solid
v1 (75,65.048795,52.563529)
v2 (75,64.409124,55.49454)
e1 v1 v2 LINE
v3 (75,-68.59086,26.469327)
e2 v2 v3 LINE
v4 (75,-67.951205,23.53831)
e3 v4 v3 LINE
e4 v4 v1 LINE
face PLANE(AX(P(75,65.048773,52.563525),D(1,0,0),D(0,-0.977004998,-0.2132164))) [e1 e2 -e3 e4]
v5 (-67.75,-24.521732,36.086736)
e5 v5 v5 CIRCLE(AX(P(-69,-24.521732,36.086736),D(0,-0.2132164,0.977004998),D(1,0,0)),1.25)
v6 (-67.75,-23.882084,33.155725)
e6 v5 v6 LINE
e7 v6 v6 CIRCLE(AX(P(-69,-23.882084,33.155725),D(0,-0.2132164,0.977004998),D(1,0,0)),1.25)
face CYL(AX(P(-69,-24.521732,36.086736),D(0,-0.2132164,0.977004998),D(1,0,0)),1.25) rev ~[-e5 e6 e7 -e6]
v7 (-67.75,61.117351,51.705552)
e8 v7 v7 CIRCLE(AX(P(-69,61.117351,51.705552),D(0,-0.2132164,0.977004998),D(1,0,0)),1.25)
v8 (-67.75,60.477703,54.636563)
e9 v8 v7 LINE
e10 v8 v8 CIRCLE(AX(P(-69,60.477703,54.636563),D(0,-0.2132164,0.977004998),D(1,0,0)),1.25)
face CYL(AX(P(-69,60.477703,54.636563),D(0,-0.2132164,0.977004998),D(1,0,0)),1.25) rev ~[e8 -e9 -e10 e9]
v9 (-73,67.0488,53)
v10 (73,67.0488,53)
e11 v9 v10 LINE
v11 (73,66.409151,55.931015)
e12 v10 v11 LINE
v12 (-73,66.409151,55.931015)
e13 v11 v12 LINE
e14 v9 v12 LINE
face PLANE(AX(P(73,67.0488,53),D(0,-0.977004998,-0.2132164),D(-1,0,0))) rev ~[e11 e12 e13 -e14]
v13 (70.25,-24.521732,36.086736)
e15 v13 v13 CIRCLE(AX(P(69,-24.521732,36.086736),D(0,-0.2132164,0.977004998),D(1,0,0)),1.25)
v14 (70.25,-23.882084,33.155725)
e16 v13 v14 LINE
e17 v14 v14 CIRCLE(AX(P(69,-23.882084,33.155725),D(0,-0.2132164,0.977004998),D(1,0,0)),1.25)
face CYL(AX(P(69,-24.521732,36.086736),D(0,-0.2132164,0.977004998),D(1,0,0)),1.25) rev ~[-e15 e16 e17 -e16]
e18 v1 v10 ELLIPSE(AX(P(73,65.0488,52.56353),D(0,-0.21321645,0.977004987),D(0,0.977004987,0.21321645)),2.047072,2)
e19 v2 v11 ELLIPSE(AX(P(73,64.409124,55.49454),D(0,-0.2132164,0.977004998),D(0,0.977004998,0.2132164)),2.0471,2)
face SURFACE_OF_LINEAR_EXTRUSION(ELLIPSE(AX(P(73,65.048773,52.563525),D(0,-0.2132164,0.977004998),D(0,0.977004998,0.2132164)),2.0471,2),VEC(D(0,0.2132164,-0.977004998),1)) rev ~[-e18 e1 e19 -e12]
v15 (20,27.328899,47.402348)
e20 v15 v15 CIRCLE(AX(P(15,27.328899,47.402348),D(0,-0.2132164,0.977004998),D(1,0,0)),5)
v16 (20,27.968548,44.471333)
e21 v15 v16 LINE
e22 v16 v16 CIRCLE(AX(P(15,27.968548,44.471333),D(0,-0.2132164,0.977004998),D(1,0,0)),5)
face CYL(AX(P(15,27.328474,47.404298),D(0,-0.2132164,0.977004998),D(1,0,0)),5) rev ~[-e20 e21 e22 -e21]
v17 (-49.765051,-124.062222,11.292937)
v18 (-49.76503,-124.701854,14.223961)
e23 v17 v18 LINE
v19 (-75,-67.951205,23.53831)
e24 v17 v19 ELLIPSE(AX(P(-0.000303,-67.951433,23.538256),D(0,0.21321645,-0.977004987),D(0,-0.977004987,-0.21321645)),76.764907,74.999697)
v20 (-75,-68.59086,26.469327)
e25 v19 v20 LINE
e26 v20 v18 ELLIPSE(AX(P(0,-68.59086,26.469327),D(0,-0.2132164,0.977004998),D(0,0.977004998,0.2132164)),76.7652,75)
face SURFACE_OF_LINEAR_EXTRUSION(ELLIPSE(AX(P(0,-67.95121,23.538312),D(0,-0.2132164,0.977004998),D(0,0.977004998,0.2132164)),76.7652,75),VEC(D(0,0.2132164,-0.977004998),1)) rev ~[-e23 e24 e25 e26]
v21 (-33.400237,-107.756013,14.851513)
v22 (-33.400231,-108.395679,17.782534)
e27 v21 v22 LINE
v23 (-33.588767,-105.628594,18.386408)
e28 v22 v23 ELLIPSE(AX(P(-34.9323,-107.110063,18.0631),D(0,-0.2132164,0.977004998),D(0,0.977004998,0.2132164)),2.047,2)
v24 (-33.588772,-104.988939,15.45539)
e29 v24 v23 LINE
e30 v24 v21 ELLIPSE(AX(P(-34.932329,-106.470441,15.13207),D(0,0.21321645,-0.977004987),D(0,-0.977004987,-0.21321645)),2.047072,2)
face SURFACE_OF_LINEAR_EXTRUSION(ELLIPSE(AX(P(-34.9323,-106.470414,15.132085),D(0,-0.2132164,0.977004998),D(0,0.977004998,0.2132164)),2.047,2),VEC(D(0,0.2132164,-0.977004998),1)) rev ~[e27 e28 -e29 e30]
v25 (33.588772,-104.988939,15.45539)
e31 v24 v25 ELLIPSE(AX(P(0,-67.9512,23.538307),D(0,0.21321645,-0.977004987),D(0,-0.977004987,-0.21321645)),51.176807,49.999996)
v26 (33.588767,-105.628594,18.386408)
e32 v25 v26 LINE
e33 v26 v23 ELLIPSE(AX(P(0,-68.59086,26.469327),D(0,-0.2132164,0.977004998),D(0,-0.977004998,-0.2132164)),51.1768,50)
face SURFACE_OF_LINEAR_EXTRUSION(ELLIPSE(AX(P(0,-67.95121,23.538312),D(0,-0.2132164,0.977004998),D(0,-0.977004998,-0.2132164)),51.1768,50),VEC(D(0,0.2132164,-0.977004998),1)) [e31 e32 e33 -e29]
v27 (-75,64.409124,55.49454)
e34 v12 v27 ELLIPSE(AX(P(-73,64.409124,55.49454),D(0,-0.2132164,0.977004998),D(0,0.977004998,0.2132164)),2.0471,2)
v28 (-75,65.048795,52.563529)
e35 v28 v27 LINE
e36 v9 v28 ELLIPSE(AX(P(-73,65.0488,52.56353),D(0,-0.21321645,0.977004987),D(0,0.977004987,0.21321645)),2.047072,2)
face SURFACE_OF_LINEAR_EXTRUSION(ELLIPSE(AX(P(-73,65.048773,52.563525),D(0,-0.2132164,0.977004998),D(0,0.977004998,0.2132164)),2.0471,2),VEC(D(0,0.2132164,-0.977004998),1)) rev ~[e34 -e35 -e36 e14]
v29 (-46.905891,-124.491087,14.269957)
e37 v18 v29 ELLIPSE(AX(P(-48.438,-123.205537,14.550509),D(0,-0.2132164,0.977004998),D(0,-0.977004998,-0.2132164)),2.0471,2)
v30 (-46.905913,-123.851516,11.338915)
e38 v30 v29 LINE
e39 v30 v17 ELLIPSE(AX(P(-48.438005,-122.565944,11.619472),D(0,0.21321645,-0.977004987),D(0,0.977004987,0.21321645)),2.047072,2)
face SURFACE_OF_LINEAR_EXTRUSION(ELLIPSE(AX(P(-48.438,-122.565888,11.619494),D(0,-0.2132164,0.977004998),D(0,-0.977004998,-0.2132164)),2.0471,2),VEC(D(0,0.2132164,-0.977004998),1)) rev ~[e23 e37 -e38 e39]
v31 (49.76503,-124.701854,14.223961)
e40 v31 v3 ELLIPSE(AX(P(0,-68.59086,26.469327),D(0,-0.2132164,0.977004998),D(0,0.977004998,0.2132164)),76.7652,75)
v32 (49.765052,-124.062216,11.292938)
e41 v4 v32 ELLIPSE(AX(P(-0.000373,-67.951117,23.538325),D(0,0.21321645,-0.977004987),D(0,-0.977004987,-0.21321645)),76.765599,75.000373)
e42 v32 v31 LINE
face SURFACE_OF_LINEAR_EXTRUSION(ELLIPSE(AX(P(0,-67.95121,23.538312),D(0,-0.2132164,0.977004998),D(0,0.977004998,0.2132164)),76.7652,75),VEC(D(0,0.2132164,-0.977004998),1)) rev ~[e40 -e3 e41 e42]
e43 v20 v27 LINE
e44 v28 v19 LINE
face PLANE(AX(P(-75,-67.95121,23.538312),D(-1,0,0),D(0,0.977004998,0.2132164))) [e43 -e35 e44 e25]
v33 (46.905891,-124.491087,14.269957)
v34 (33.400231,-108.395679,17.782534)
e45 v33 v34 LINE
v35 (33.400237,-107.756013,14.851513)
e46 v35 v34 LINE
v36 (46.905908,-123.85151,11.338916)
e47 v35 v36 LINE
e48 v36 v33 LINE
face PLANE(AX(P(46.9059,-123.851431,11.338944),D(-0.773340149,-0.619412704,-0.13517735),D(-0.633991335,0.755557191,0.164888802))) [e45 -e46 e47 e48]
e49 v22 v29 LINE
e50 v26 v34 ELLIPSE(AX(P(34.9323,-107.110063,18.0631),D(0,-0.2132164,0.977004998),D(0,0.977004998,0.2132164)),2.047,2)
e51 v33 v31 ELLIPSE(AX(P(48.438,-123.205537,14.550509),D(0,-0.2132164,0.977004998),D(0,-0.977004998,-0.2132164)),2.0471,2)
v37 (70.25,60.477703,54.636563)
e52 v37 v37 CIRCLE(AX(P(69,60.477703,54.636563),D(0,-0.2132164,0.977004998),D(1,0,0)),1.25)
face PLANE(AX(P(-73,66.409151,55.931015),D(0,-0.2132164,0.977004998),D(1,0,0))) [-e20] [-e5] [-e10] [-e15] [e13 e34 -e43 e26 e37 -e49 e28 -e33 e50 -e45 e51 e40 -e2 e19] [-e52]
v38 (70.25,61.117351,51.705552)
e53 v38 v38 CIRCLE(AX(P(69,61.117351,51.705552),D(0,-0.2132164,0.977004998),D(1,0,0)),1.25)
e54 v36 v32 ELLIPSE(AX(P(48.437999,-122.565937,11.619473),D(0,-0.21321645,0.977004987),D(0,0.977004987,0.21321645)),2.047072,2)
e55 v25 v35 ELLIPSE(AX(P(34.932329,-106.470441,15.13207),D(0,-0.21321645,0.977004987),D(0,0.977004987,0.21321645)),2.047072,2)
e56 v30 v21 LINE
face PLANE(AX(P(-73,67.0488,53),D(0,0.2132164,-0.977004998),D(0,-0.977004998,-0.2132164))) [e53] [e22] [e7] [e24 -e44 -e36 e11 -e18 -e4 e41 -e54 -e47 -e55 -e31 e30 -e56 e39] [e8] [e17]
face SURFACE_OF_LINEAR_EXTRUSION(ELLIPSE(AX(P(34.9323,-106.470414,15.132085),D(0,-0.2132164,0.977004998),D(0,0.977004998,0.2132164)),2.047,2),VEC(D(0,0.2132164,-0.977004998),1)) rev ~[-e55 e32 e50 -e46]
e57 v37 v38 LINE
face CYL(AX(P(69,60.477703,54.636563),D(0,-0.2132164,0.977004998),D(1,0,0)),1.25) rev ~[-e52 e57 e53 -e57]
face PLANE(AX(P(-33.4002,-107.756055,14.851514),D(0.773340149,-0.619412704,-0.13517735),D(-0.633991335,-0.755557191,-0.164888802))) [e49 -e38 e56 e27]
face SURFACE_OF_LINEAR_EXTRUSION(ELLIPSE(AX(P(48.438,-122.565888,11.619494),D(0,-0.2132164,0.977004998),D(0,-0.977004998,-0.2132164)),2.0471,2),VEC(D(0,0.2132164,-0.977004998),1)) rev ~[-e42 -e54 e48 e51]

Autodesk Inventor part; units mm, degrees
ref_plane "YZ Plane" through (0, 0, 0) normal (1, 0, 0) x (0, 1, 0)
ref_plane "XZ Plane" through (0, 0, 0) normal (0, 1, 0) x (-1, 0, 0)
sketch "Sketch1" plane through (0, 0, 0) normal (0, 0, 1) x (1, 0, 0)
  line L0 (-75, 67.0488) -> (75, 67.0488)
  arc A0 (-75, -67.9512) -> (-48.2091, -125.4046) centre (0, -67.9512) ccw
  arc A1 (48.2091, -125.4046) -> (75, -67.9512) centre (0, -67.9512) ccw
  arc A2 (32.1394, -106.2534) -> (-32.1394, -106.2534) centre (0, -67.9512) ccw
  line L1 (-48.2091, -125.4046) -> (-32.1394, -106.2534) construction
  line L2 (-32.1394, -106.2534) -> (0, -67.9512) construction
  line L3 (-48.2091, -125.4046) -> (-32.1394, -106.2534) construction
  line L4 (75, -67.9512) -> (75, 67.0488)
  line L5 (-75, -67.9512) -> (-75, 67.0488)
  line L6 (0, -67.9512) -> (0, -148.7803) construction
  line L7 (-32.1394, -106.2534) -> (-48.2091, -125.4046)
  line L8 (48.2091, -125.4046) -> (32.1394, -106.2534)
  point P0 (0, 0)
  dimension "d0" = 150
  dimension "d2" = 135
  dimension "d3" = 135
  dimension "d7" = 135
  dimension "d8" = 50
  dimension "d19" = 75
  dimension "d25" = 75
  dimension "d26" = 0
  dimension "d29" = 50
  dimension "d31" = 50
  dimension "d34" = 40
  dimension "d35" = 40
extrude "Extrusion1" add sketch "Sketch1" along normal blind 3
sketch "Sketch5" plane through (0, 0, 3) normal (0, 0, 1) x (1, 0, 0)
  arc A0 (32.1394, -106.2534) -> (-32.1394, -106.2534) centre (0, -67.9512) ccw projected
  line L0 (32.1394, -106.2534) -> (48.2091, -125.4046) projected
  line L1 (-48.2091, -125.4046) -> (-32.1394, -106.2534) projected
  arc A1 (37.2817, -112.3818) -> (-37.2817, -112.3818) centre (0, -67.9512) ccw
  arc A2 (32.1394, -106.2534) -> (-32.1394, -106.2534) centre (0, -67.9512) ccw projected
  arc A3 (32.1394, -106.2534) -> (-32.1394, -106.2534) centre (0, -67.9512) ccw
  arc A4 (41.7812, -117.7441) -> (-41.7812, -117.7441) centre (0, -67.9512) ccw
  arc A5 (46.2807, -123.1064) -> (-46.2807, -123.1064) centre (0, -67.9512) ccw
  line L2 (-46.2807, -123.1064) -> (-41.7812, -117.7441)
  line L3 (-37.2817, -112.3818) -> (-32.1394, -106.2534)
  line L4 (32.1394, -106.2534) -> (37.2817, -112.3818)
  line L5 (41.7812, -117.7441) -> (46.2807, -123.1064)
  point P0 (0, 0)
  dimension "d49" = 58
  dimension "d52" = 65
  dimension "d53" = 72
extrude "Extrusion3" add sketch "Sketch5" along normal blind 8 contours A0 L1 A1 L0 | A4 L1 A5 L0
sketch "Sketch7" plane through (-48.2091, -125.4046, 3) normal (0.7660444, -0.6427876, 0) x (0, 0, -1)
  line L0 (0, 10) -> (-8, 10) projected
  line L1 (-4.5, 10) -> (0, 10)
  line L2 (0, 10) -> (0, 17) projected
  line L3 (0, 10) -> (0, 17)
  line L4 (0, 17) -> (-4.5, 17)
  line L5 (0, 17) -> (-8, 17) projected
  arc A0 (-4.5, 10) -> (-4.5, 17) centre (-4.5, 13.5) ccw
  line L6 (-19.076, 75) -> (19.2246, 75) construction
  point P0 (3, 127.0537)
  dimension "d58" = 4.5
  dimension "d59" = 0
  dimension "d60" = 0
  dimension "d61" = 3.5
  dimension "d62" = 58
revolve "Revolution1" add sketch "Sketch7" angle 280 about axis through (0, -67.9512, 22.076) along (0, 0, -1)
sketch "Sketch18" plane through (0, 0, 0) normal (0, 0, -1) x (-1, 0, 0)
  arc A0 (32.1394, -106.2534) -> (-32.1394, -106.2534) centre (0, -67.9512) ccw projected
  line L0 (32.1394, -106.2534) -> (48.2091, -125.4046) projected
  arc A1 (32.1394, -106.2534) -> (-32.1394, -106.2534) centre (0, -67.9512) ccw
  line L1 (-32.1394, -106.2534) -> (-47.5756, -125.4046)
  line L2 (32.1394, -106.2534) -> (48.2091, -125.4046)
  line L3 (75, 67.0488) -> (-75, 67.0488) projected
  line L4 (-75, 67.0488) -> (-75, -67.9512) projected
  arc A2 (-75, -67.9512) -> (-48.2091, -125.4046) centre (0, -67.9512) ccw projected
  line L5 (-48.2091, -125.4046) -> (-32.1394, -106.2534) projected
  arc A3 (32.1394, -106.2534) -> (-32.1394, -106.2534) centre (0, -67.9512) ccw projected
  line L6 (32.1394, -106.2534) -> (48.2091, -125.4046) projected
  arc A4 (48.2091, -125.4046) -> (75, -67.9512) centre (0, -67.9512) ccw projected
  line L7 (75, -67.9512) -> (75, 67.0488) projected
  arc A5 (-75, -67.9512) -> (-48.2091, -125.4046) centre (0, -67.9512) ccw projected
  line L8 (-75, -67.9512) -> (-75, 67.0488)
  line L9 (75, -67.9512) -> (75, 67.0488) projected
  line L10 (75, 67.0488) -> (75, -67.9512)
  arc A6 (-75, -67.9512) -> (-48.2091, -125.4046) centre (0, -67.9512) ccw
  arc A7 (48.2091, -125.4046) -> (75, -67.9512) centre (0, -67.9512) ccw projected
  arc A8 (48.2091, -125.4046) -> (75, -67.9512) centre (0, -67.9512) ccw
  arc A9 (35.4639, -107.3379) -> (-35.4639, -107.3379) centre (0, -67.9512) ccw
  line L11 (0, -67.9512) -> (35.4639, -107.3379) construction
  line L12 (0, -67.9512) -> (-35.4639, -107.3379) construction
  line L13 (0, -67.9512) -> (0, -163.7516) construction
  arc A10 (46.2807, -123.1064) -> (-46.2807, -123.1064) centre (0, -67.9512) ccw construction
  line L14 (72, -67.9512) -> (72, 64.0488)
  line L15 (72, 64.0488) -> (-72, 64.0488)
  line L16 (-72, 64.0488) -> (-72, -67.9512)
  arc A11 (-72, -67.9512) -> (-48.1774, -121.4576) centre (0, -67.9512) ccw
  arc A12 (48.1774, -121.4576) -> (72, -67.9512) centre (0, -67.9512) ccw
  line L17 (-48.1774, -121.4576) -> (-35.4639, -107.3379)
  line L18 (35.4639, -107.3379) -> (48.1774, -121.4576)
  point P0 (0, 0)
  dimension "d99" = 84
  dimension "d100" = 42
  dimension "d101" = 53
  dimension "d102" = 3
  dimension "d103" = 3
extrude "Extrusion8" add sketch "Sketch18" against normal blind 53
sketch "Sketch19" plane through (75, -67.9512, 0) normal (1, 0, 0) x (0, 0, -1)
  line L0 (-3, 132) -> (-3, 0) projected
  line L1 (-3, 0) -> (-3, 0) projected
  line L2 (-3, 0) -> (-3, 132) projected
  line L3 (-11, 0) -> (-11, -53.5064) projected
  line L4 (-53, 0) -> (-53, 135) projected
  line L5 (-53, 0) -> (-53, -57.4533) projected
  line L6 (0, -57.4533) -> (-53, -57.4533) projected
  line L7 (-53, 135) -> (-53, -57.4533)
  line L8 (-53, -57.4533) -> (-11, -57.4533)
  line L9 (0, 135) -> (-53, 135) projected
  line L10 (-11, -57.4533) -> (-53, 135)
  point P0 (0, 67.9512)
  dimension "d106" = 0
extrude "Extrusion9" cut sketch "Sketch19" against normal blind 150
sketch "Sketch20" plane through (-32.1394, -106.2534, 15.1794) normal (0.7660444, -0.6427876, 0) x (0, 0, -1)
  ellipse E0 centre (7.6794, -11.4625) end of major axis (11.1794, -11.4625) minor radius 3.4979 (7.6794, -14.9604) -> (7.6794, -7.9647) ccw projected
  circle A0 centre (7.6794, -11.4625) radius 3.5
  line L0 (-25.5689, 50.0375) -> (41.9904, 50.0375) construction
  point P0 (15.1794, 102.0537)
  dimension "d109" = 61.5
revolve "Revolution4" cut sketch "Sketch20" angle 2 about axis through (0.0241, -67.9225, 40.7483) along (0, 0, -1)
mirror "Mirror3" about plane through (0, 0, 0) normal (1, 0, 0) of "Revolution4"
fillet "Fillet1" radius 2 12 edges at (75, 67.0488, 26.5) (-48.2091, -125.4046, 5.5) (-32.1394, -106.2534, 7.5897) (48.2091, -125.4046, 5.5) (32.1394, -106.2534, 7.5897) (-75, 67.0488, 26.5) (0, 67.0488, 0) (-67.9731, -99.6476, 0) (-75, -0.4512, 0) (67.9731, -99.6476, 0) (75, -0.4512, 0) (0, -17.9512, 0)
sketch "Sketch23" plane through (0, 0, 0) normal (0, 0, -1) x (-1, 0, 0)
  arc A0 (43.4935, -116.2556) -> (-43.4935, -116.2556) centre (0, -67.9512) ccw projected
  line L0 (0, -67.9512) -> (0, -128.8082) construction
  arc A1 (43.4935, -116.2556) -> (-43.4935, -116.2556) centre (0, -67.9512) ccw projected
  line L1 (-56.2917, -100.4512) -> (-50.2295, -96.9512) construction
  line L2 (0, -67.9512) -> (-50.2295, -96.9512) construction
  line L3 (-56.2917, -100.4512) -> (0, -67.9512) construction
  circle A2 centre (-55.0106, -95.6701) radius 3.5 construction
  line L4 (-59.6154, -93.8549) -> (-53.1953, -91.0653) construction
  arc A3 (38.8096, -111.0536) -> (-38.8096, -111.0536) centre (0, -67.9512) ccw construction
  arc A4 (-62.3186, -49.4745) -> (-59.6154, -93.8549) centre (0, -67.9512) ccw construction
  line L5 (0, -67.9512) -> (-62.3186, -49.4745) construction
  line L6 (0, -67.9512) -> (-59.6154, -93.8549) construction
  arc A5 (35.4639, -107.3379) -> (-35.4639, -107.3379) centre (0, -67.9512) ccw construction
  arc A6 (-55.6074, -51.4643) -> (-53.1953, -91.0653) centre (0, -67.9512) ccw construction
  line L7 (0, -67.9512) -> (-55.6074, -51.4643) construction
  line L8 (0, -67.9512) -> (-53.1953, -91.0653) construction
  line L9 (-62.3186, -49.4745) -> (-55.6074, -51.4643)
  arc A7 (-62.3186, -49.4745) -> (-56.2917, -100.4512) centre (0, -67.9512) ccw
  arc A8 (-55.6074, -51.4643) -> (-50.2295, -96.9512) centre (0, -67.9512) ccw
  line L10 (-56.2917, -100.4512) -> (-50.2295, -96.9512)
  point P0 (0, 0)
  dimension "d113" = 7
  dimension "d114" = 60
  dimension "d115" = 7
  dimension "d116" = 7
  dimension "d117" = 40
  dimension "d118" = 40
extrude "Extrusion10" cut sketch "Sketch23" against normal up to next
sketch "Sketch24" plane through (-73, 67.0488, 53) normal (0, -0.2132164, 0.977005) x (1, 0, 0)
  line L0 (146, 0) -> (0, 0) projected
  ellipse E0 centre (0, -2.0471) end of major axis (0, 0) minor radius 2 (0, 0) -> (-2, -2.0471) ccw projected
  line L1 (-2, -138.1774) -> (-2, -2.0471) projected
  ellipse E1 centre (73, -138.1774) end of major axis (73, -61.4122) minor radius 75 (-2, -138.1774) -> (23.235, -195.609) ccw projected
  ellipse E2 centre (24.562, -194.0775) end of major axis (24.562, -196.1246) minor radius 2 (23.235, -195.609) -> (26.0941, -195.3933) ccw projected
  line L2 (39.5998, -178.9191) -> (26.0941, -195.3933) projected
  ellipse E3 centre (38.0677, -177.6032) end of major axis (38.0677, -175.5562) minor radius 2 (39.5998, -178.9191) -> (39.4112, -176.0869) ccw projected
  ellipse E4 centre (73, -138.1774) end of major axis (73, -189.3542) minor radius 50 (106.5888, -176.0869) -> (39.4112, -176.0869) ccw projected
  ellipse E5 centre (107.9323, -177.6032) end of major axis (107.9323, -175.5562) minor radius 2 (106.5888, -176.0869) -> (106.4002, -178.9191) ccw projected
  line L3 (119.9059, -195.3933) -> (106.4002, -178.9191) projected
  ellipse E6 centre (121.438, -194.0775) end of major axis (121.438, -196.1246) minor radius 2 (119.9059, -195.3933) -> (122.765, -195.609) ccw projected
  ellipse E7 centre (73, -138.1774) end of major axis (73, -61.4122) minor radius 75 (122.765, -195.609) -> (148, -138.1774) ccw projected
  line L4 (148, -2.0471) -> (148, -138.1774) projected
  ellipse E8 centre (146, -2.0471) end of major axis (146, 0) minor radius 2 (148, -2.0471) -> (146, 0) ccw projected
  point P0 (73, -76.8075)
extrude "Extrusion11" add sketch "Sketch24" along normal blind 3
ref_plane "Work Plane1" through (-73, 67.0488, 53) normal (0, -0.2132164, 0.977005) x (1, 0, 0)
split "Split1" plane through (-73, 67.0488, 53) removes the side toward (0, 0.2132164, -0.977005)
sketch "Sketch25" plane through (-73, 66.4091, 55.931) normal (0, -0.2132164, 0.977005) x (1, 0, 0)
  circle A0 centre (88, -40) radius 5
  line L0 (146, 0) -> (0, 0) projected
  line L1 (148, -138.1774) -> (148, -2.0471) projected
  point P0 (73, -76.8075)
  dimension "d124" = 10
  dimension "d125" = 40
  dimension "d126" = 60
extrude "Extrusion12" cut sketch "Sketch25" against normal blind 10
sketch "Sketch26" plane through (-73, 66.4091, 55.931) normal (0, -0.2132164, 0.977005) x (1, 0, 0)
  circle A0 centre (4, -6.071) radius 1.25
  circle A1 centre (4, -93.071) radius 1.25
  circle A2 centre (142, -93.071) radius 1.25
  circle A3 centre (142, -6.071) radius 1.25
  line L0 (146, 0) -> (0, 0) projected
  line L1 (-2, -2.0471) -> (-2, -138.1774) projected
  line L2 (148, -138.1774) -> (148, -2.0471) projected
  point P0 (73, -76.8075)
  dimension "d129" = 2.5
  dimension "d130" = 2.5
  dimension "d131" = 2.5
  dimension "d132" = 2.5
  dimension "d133" = 6.071
  dimension "d134" = 6.071
  dimension "d135" = 6
  dimension "d136" = 6
  dimension "d137" = 6
  dimension "d138" = 6
  dimension "d139" = 93.071
  dimension "d140" = 93.071
extrude "Extrusion13" cut sketch "Sketch26" against normal up to next
properties part number "Lock Base"
